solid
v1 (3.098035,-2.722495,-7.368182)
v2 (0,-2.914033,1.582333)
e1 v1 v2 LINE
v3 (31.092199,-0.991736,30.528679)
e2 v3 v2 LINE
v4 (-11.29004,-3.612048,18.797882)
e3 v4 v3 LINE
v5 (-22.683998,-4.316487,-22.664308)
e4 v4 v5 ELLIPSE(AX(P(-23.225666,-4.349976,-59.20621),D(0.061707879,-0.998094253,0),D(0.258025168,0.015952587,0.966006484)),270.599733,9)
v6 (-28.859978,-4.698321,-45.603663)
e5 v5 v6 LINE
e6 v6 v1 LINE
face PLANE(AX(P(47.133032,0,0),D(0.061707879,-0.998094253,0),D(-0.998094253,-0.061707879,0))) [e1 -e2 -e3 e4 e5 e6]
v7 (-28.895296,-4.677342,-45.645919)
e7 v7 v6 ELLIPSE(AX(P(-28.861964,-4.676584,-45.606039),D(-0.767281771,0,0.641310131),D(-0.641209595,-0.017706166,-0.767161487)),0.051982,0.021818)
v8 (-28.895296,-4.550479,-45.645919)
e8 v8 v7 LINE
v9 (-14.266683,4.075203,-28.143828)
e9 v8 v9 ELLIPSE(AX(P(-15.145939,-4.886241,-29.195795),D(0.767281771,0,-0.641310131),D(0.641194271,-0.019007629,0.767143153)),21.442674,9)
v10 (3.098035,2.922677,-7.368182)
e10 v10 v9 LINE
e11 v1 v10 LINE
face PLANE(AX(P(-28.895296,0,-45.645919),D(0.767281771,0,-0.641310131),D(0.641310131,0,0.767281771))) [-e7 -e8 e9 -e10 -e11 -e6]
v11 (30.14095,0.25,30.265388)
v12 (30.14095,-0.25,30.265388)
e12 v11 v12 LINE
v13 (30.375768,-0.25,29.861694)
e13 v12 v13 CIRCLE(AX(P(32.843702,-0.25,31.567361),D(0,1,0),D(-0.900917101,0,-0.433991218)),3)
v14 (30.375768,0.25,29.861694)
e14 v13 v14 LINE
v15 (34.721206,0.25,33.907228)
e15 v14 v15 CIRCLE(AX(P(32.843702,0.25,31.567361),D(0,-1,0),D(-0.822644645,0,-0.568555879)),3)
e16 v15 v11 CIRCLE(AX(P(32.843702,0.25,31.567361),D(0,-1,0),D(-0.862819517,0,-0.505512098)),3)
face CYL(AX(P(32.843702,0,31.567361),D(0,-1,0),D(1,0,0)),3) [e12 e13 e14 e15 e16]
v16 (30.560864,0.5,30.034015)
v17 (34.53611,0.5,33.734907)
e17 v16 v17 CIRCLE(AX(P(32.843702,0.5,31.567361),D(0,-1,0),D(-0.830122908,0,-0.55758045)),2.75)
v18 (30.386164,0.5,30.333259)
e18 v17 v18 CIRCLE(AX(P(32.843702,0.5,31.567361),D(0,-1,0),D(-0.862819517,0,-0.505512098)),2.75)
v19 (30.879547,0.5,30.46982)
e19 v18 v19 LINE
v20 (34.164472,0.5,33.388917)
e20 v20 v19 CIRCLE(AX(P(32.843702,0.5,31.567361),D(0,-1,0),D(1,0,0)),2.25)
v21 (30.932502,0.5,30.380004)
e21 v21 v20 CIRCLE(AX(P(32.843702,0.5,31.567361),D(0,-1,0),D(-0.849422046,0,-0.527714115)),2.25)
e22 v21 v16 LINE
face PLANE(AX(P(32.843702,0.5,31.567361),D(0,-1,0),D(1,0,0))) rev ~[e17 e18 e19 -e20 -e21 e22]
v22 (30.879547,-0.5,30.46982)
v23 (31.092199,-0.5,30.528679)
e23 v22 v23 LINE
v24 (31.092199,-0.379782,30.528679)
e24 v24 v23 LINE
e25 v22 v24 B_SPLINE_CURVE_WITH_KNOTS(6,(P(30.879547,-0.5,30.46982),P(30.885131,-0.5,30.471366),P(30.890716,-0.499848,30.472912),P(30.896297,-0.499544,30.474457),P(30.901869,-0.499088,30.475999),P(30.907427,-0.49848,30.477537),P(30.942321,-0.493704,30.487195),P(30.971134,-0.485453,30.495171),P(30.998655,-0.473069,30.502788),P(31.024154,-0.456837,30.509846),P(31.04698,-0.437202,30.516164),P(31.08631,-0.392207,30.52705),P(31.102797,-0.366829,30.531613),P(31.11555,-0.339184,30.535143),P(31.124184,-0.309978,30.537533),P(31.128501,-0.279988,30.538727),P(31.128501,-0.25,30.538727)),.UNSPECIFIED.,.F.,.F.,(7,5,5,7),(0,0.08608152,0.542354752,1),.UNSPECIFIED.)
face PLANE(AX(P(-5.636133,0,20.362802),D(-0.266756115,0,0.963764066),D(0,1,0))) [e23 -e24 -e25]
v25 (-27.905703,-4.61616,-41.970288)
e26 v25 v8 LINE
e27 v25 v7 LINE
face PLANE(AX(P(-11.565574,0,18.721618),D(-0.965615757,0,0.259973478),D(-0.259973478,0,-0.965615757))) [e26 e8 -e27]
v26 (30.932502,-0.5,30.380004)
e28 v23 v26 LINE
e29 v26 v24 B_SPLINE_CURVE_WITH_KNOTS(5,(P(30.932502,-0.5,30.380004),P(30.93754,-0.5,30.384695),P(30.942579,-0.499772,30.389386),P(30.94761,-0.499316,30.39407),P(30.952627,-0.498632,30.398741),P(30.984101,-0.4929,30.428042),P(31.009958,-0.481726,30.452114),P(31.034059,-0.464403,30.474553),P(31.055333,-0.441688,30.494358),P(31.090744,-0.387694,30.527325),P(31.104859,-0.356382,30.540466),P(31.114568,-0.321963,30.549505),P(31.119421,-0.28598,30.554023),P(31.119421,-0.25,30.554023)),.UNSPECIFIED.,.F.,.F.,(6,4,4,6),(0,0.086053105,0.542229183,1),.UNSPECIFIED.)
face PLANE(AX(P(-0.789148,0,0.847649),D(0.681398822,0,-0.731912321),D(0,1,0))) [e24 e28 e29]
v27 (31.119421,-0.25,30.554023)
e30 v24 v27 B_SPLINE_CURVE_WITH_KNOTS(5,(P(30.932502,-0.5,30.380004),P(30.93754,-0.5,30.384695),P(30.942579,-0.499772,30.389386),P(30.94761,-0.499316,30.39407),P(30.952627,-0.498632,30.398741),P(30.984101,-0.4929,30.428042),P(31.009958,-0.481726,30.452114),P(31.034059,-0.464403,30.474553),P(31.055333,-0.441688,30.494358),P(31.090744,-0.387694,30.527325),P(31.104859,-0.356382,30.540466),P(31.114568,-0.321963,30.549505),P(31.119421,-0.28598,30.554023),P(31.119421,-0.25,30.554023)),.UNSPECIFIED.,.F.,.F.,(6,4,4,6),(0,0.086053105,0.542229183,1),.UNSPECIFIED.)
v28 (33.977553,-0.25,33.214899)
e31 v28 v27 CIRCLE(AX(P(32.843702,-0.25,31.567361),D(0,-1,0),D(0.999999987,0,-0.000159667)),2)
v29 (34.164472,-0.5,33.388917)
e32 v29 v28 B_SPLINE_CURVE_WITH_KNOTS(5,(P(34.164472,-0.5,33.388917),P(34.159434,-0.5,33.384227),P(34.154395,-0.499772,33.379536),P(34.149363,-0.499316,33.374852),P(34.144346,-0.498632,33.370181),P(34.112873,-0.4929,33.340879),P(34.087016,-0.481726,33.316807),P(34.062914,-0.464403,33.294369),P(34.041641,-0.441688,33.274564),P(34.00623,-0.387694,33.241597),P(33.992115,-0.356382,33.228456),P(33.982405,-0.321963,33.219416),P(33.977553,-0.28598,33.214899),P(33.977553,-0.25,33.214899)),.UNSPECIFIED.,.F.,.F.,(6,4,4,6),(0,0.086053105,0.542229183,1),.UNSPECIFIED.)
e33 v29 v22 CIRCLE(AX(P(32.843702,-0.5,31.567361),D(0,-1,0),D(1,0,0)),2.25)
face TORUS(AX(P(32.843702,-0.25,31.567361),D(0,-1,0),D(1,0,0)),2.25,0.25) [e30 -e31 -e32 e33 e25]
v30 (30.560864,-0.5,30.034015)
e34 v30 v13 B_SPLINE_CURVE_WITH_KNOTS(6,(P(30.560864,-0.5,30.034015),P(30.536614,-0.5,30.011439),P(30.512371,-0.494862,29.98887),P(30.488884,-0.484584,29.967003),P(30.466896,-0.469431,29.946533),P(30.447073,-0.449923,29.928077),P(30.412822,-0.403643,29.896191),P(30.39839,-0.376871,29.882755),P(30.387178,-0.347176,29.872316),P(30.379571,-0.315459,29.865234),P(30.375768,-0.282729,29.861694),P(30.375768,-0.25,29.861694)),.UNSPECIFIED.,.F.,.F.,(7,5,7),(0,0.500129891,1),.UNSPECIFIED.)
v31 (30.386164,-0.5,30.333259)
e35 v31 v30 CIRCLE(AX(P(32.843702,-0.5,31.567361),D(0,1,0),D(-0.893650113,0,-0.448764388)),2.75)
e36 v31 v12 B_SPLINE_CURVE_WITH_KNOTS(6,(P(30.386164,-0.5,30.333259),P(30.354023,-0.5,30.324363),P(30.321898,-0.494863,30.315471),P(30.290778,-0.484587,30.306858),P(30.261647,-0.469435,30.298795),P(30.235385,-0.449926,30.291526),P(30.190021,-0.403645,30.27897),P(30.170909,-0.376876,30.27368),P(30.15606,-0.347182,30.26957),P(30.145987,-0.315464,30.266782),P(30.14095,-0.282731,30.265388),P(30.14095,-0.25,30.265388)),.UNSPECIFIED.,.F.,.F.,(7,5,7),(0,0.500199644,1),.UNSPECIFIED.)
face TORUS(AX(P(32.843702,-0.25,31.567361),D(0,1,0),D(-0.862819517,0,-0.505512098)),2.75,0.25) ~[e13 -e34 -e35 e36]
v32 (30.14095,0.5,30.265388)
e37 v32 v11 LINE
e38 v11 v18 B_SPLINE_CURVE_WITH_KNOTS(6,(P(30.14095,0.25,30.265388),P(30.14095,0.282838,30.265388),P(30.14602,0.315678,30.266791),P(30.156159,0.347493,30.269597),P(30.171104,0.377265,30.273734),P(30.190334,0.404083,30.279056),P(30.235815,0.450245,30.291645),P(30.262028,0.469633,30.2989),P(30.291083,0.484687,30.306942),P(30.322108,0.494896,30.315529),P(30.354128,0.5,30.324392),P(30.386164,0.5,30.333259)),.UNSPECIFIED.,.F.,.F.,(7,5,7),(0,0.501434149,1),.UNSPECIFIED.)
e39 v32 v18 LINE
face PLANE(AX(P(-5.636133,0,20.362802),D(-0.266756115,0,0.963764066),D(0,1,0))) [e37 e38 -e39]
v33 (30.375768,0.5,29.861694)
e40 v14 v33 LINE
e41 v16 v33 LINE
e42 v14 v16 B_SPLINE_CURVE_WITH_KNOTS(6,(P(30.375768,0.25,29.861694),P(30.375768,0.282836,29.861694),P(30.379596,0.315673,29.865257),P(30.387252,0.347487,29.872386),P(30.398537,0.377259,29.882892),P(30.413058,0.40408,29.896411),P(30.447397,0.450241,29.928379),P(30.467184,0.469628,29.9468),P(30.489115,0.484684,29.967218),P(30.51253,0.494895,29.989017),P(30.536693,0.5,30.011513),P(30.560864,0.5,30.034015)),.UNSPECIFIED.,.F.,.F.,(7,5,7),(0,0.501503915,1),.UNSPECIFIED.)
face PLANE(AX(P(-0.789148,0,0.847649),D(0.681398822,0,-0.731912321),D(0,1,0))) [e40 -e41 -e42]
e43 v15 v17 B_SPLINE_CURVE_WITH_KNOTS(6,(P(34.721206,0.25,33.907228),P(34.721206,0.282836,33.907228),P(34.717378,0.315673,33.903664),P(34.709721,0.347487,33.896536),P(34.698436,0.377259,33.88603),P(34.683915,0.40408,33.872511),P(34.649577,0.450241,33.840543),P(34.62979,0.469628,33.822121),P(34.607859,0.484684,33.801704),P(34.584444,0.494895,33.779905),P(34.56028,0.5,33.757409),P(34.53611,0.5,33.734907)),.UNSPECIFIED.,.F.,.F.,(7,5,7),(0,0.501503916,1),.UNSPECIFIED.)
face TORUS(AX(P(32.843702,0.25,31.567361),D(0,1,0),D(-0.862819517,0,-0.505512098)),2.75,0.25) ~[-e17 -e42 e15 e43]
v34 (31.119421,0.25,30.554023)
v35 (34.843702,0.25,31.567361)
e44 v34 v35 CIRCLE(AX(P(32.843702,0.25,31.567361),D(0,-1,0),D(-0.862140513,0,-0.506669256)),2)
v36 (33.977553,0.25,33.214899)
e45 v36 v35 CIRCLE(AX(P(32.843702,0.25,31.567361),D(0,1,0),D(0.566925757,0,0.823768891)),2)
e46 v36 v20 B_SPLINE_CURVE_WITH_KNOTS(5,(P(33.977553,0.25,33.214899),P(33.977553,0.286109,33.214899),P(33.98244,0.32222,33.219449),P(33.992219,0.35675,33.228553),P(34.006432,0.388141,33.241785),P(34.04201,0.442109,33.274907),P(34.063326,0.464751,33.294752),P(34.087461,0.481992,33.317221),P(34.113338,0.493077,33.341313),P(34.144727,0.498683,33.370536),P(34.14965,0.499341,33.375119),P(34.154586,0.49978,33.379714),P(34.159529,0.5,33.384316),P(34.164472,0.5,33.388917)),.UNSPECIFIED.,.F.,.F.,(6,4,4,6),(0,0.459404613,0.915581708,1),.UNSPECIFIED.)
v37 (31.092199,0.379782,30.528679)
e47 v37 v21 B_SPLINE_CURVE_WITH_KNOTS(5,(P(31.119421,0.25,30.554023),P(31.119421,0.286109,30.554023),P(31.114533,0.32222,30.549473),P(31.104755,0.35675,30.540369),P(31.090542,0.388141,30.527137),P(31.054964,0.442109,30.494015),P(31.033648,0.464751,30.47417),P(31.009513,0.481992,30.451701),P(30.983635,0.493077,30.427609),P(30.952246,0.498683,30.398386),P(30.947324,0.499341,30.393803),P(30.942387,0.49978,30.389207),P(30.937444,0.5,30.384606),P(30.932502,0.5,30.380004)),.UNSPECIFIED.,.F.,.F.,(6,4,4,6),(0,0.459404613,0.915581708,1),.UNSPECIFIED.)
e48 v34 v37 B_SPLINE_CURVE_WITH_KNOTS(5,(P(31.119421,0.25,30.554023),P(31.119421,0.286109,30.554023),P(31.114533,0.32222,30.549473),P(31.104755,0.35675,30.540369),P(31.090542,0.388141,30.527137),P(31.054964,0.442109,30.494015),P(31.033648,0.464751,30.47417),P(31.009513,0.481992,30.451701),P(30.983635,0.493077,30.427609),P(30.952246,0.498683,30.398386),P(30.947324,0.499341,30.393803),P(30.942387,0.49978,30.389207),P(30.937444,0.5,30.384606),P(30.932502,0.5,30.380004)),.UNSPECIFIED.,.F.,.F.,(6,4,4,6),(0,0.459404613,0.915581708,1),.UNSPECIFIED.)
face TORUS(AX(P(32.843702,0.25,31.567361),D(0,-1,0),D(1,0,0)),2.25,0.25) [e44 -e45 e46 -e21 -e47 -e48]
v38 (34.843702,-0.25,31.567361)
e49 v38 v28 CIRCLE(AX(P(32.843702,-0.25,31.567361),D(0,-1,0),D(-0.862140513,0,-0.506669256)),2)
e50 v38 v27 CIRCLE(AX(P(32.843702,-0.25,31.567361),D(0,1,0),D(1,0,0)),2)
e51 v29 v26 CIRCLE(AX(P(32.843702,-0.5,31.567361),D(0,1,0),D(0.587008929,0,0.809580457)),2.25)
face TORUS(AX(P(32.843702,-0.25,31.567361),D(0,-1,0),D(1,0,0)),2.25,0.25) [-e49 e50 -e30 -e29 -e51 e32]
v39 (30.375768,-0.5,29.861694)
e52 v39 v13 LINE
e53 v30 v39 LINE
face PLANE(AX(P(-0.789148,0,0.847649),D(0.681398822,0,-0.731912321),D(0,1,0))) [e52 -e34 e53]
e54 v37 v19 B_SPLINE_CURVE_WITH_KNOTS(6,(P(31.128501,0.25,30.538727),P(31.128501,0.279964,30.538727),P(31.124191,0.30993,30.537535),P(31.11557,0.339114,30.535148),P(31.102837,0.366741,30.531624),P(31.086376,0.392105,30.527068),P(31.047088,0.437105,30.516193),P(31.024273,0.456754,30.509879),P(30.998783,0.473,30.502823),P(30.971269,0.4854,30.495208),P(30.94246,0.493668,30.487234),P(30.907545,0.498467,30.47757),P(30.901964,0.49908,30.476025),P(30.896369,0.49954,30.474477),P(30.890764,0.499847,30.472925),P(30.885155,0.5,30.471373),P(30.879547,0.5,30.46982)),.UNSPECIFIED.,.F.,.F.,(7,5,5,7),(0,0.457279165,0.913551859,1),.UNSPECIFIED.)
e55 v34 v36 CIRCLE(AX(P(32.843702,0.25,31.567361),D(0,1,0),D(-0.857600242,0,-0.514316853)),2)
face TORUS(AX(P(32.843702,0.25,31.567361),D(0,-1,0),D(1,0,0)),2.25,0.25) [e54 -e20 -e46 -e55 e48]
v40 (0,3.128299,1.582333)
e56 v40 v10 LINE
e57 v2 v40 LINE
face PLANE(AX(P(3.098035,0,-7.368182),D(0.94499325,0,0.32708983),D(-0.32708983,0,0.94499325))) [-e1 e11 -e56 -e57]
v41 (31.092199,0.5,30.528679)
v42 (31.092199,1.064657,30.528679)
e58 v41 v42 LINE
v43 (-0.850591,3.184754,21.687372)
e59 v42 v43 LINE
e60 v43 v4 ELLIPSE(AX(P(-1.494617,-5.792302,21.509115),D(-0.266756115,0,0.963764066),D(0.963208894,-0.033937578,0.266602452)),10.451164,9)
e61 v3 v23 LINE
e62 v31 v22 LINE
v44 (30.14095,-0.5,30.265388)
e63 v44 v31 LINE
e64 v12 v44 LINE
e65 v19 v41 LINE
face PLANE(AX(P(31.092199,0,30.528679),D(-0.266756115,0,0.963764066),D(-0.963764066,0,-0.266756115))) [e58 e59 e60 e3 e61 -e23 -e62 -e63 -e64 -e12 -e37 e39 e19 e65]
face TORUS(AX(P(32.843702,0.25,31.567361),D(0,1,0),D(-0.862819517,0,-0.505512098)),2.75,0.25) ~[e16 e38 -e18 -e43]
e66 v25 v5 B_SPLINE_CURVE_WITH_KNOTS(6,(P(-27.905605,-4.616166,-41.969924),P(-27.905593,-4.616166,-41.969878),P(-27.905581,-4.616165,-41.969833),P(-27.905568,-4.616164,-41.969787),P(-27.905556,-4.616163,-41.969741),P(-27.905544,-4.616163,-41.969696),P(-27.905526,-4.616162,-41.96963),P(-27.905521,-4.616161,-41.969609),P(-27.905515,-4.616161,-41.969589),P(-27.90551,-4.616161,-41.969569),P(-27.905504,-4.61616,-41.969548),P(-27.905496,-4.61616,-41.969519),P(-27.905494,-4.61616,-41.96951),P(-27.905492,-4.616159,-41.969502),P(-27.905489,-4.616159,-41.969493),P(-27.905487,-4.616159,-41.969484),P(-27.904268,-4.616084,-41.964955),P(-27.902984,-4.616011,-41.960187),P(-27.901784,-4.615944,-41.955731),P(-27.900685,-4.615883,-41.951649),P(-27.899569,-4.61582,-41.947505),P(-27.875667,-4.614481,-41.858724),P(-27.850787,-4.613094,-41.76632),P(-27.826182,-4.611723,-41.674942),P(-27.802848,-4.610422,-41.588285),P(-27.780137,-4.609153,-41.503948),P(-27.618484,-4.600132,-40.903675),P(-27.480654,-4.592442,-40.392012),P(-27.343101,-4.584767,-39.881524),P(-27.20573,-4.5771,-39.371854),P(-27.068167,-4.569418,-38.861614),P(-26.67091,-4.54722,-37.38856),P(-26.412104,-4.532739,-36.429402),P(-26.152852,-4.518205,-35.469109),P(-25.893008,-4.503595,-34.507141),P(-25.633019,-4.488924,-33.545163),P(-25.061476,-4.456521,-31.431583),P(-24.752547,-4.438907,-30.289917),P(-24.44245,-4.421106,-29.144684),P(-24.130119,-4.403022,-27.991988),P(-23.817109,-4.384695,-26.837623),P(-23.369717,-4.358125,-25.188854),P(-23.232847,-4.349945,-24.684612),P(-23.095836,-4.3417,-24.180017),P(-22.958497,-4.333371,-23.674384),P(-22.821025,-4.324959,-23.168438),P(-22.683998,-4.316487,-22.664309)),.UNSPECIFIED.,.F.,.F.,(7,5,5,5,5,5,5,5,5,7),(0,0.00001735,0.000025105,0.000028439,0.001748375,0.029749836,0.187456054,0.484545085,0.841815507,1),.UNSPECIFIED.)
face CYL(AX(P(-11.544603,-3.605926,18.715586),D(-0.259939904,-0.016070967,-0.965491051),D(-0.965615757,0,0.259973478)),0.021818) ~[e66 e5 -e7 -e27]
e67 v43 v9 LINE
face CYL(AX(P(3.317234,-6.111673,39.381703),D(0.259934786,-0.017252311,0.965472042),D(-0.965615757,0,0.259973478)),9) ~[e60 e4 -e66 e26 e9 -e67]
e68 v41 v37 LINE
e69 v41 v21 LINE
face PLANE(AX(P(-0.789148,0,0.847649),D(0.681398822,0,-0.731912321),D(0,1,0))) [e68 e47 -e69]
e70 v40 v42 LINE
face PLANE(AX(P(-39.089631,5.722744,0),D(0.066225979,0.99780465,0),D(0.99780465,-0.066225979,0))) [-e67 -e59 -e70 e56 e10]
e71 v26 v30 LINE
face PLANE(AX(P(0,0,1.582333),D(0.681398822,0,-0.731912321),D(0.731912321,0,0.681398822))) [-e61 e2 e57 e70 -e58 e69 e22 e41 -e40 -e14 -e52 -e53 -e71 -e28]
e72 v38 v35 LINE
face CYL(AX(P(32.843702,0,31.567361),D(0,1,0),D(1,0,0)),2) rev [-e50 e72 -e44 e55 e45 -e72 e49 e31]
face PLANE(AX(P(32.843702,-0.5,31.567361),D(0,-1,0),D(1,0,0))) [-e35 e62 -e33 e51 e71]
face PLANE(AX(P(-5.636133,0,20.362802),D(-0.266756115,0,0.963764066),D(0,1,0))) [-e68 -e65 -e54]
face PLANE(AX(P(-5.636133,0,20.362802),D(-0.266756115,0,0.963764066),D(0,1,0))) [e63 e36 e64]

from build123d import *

# Parameters (mm, degrees)
F1_DEPTH      = 5
F1_DEPTH_BACK = 5
F2_W          = 100.360032171
F2_H          = 34.278569743
F3_DEPTH      = 63.9
F3_DEPTH_BACK = 50
F4_R          = 0.0218183936
F5_T1_DEPTH   = 111.9716351384
F6_R          = 3
F6_R_2        = 2
F7_DEPTH      = 0.5
F7_DEPTH_BACK = 0.5
F8_T4_ANGLE   = 359.64
F8_T9_ANGLE   = 359.64
F8_T34_ANGLE  = 359.64
F8_T39_ANGLE  = 359.64


# Not quite as in the source:
# - a fillet or chamfer that OpenCascade refuses, or shapes differently, is made with other operations: its cross-section is extruded or revolved along the edge and cut away or added


with BuildPart() as f1:
    # F0 (on Front) → F1 (new body, two sides)
    with BuildSketch(Plane.XZ) as f1_sk:
        Polygon((31.0921985656, 30.5286794901), (-11.5655744448, 18.7216177583), (-28.8952961564, -45.6459186971), (3.0980354641, -7.3681822978), (0, 1.582333236), align=None)
    extrude(amount=F1_DEPTH)
    extrude(f1_sk.sketch, amount=-F1_DEPTH_BACK)

    # F2 (on Top) → F3 (cut, two sides)
    with BuildSketch(Plane.XY) as f3_sk:
        with Locations((1.9043665379, 3.6182934418)):
            Rectangle(F2_W, F2_H)
        Polygon((-39.0896312892, -5.3307767957), (-39.0896312892, 5.7227437609), (47.1330322325, 0), align=None, mode=Mode.SUBTRACT)
    extrude(amount=-F3_DEPTH, mode=Mode.SUBTRACT)
    extrude(f3_sk.sketch, amount=F3_DEPTH_BACK, mode=Mode.SUBTRACT)

    # F4
    f4_edges = [f1.edges().sort_by_distance(p)[0] for p in [
        (-20.230435, -4.164794, -13.46215),
    ]]
    fillet(f4_edges, radius=F4_R)

    # F5: fillet of radius 9 on 2 edges, made by hand

    # F5_s2 → F5_t1 (cut)
    with BuildSketch(Plane(origin=(10.1347631785, -0.6726613442, 37.6434053136), x_dir=(-0.0662259794, -0.99780465, 0), z_dir=(-0.259934786, 0.0172523106, -0.9654720425))):
        with BuildLine():
            ThreePointArc((6.4541084226, 15.6543338505), (-0.2785467468, 13.2370471707), (-3.1214312203, 6.6727552521))
            Line((-3.1214312203, 6.6727552521), (-3.1214312203, 16.2679345229))
            Line((-3.1214312203, 16.2679345229), (6.4541084226, 15.6543338505))
        make_face()
    extrude(amount=F5_T1_DEPTH, mode=Mode.SUBTRACT)

    # F6 (on Front) → F7 (join, two sides)
    with BuildSketch(Plane.XZ) as f7_sk:
        with Locations((32.8437015414, 31.5673612058)):
            Circle(F6_R)
        with Locations((32.8437015414, 31.5673612058)):
            Circle(F6_R_2, mode=Mode.SUBTRACT)
    extrude(amount=F7_DEPTH)
    extrude(f7_sk.sketch, amount=-F7_DEPTH_BACK)

    # F8: fillet of radius 0.25 on 4 edges, made by hand


with BuildPart() as f8_tool2:
    # F8_s3 → F8_t4 (revolve)
    with BuildSketch(Plane(origin=(-5.375639349, 0, 9.1752631985), x_dir=(0, 1, 0), z_dir=(-0.5055120978, 0, 0.8628195171))):
        with BuildLine():
            ThreePointArc((0.25, -41.2958696863), (0.4267766953, -41.369092991), (0.5, -41.5458696863))
            Line((0.5, -41.5458696863), (0.5, -41.2958696863))
            Line((0.5, -41.2958696863), (0.25, -41.2958696863))
        make_face()
    revolve(axis=Axis((32.8437015414, 0.5, 31.5673612058), (0, -1, 0)), revolution_arc=F8_T4_ANGLE)

    split(bisect_by=Plane(origin=(-0.7891478665, 0, 0.8476490244), x_dir=(0, 1, 0), z_dir=(0.6813988218, 0, -0.731912321)), keep=Keep.TOP)


with BuildPart() as f1_1:
    add(f1.part)

    # F8_t1: cut F8_tool2
    add(f8_tool2.part, mode=Mode.SUBTRACT)


with BuildPart() as f8_tool7:
    # F8_s8 → F8_t9 (revolve)
    with BuildSketch(Plane(origin=(-5.375639349, 0, 9.1752631985), x_dir=(0, 1, 0), z_dir=(-0.5055120978, 0, 0.8628195171))):
        with BuildLine():
            ThreePointArc((0.25, -41.2958696863), (0.4267766953, -41.369092991), (0.5, -41.5458696863))
            Line((0.5, -41.5458696863), (0.5, -41.2958696863))
            Line((0.5, -41.2958696863), (0.25, -41.2958696863))
        make_face()
    revolve(axis=Axis((32.8437015414, 0.5, 31.5673612058), (0, -1, 0)), revolution_arc=F8_T9_ANGLE)

    split(bisect_by=Plane(origin=(-5.636132621, 0, 20.3628024875), x_dir=(0, 1, 0), z_dir=(-0.2667561154, 0, 0.963764066)), keep=Keep.TOP)


with BuildPart() as f1_2:
    add(f1_1.part)

    # F8_t6: cut F8_tool7
    add(f8_tool7.part, mode=Mode.SUBTRACT)


with BuildPart() as f8_tool12:
    # F8_s13 → F8_t14 (revolve)
    with BuildSketch(Plane.XY.offset(31.5673612058)):
        with BuildLine():
            ThreePointArc((35.0937015414, -0.5), (34.9169248461, -0.4267766953), (34.8437015414, -0.25))
            Line((34.8437015414, -0.25), (34.8437015414, -0.5))
            Line((34.8437015414, -0.5), (35.0937015414, -0.5))
        make_face()
    revolve(axis=Axis((32.8437015414, -0.5, 31.5673612058), (0, -1, 0)))

    split(bisect_by=Plane(origin=(-0.7891478665, 0, 0.8476490244), x_dir=(0, 1, 0), z_dir=(0.6813988218, 0, -0.731912321)), keep=Keep.TOP)


with BuildPart() as f1_3:
    add(f1_2.part)

    # F8_t11: cut F8_tool12
    add(f8_tool12.part, mode=Mode.SUBTRACT)


with BuildPart() as f8_tool17:
    # F8_s18 → F8_t19 (revolve)
    with BuildSketch(Plane.XY.offset(31.5673612058)):
        with BuildLine():
            ThreePointArc((35.0937015414, -0.5), (34.9169248461, -0.4267766953), (34.8437015414, -0.25))
            Line((34.8437015414, -0.25), (34.8437015414, -0.5))
            Line((34.8437015414, -0.5), (35.0937015414, -0.5))
        make_face()
    revolve(axis=Axis((32.8437015414, -0.5, 31.5673612058), (0, -1, 0)))

    split(bisect_by=Plane(origin=(-5.636132621, 0, 20.3628024875), x_dir=(0, 1, 0), z_dir=(-0.2667561154, 0, 0.963764066)), keep=Keep.TOP)


with BuildPart() as f1_4:
    add(f1_3.part)

    # F8_t16: cut F8_tool17
    add(f8_tool17.part, mode=Mode.SUBTRACT)


with BuildPart() as f8_tool22:
    # F8_s23 → F8_t24 (revolve)
    with BuildSketch(Plane.XY.offset(31.5673612058)):
        with BuildLine():
            ThreePointArc((34.8437015414, 0.25), (34.9169248461, 0.4267766953), (35.0937015414, 0.5))
            Line((35.0937015414, 0.5), (34.8437015414, 0.5))
            Line((34.8437015414, 0.5), (34.8437015414, 0.25))
        make_face()
    revolve(axis=Axis((32.8437015414, 0.5, 31.5673612058), (0, -1, 0)))

    split(bisect_by=Plane(origin=(-0.7891478665, 0, 0.8476490244), x_dir=(0, 1, 0), z_dir=(0.6813988218, 0, -0.731912321)), keep=Keep.TOP)


with BuildPart() as f1_5:
    add(f1_4.part)

    # F8_t21: cut F8_tool22
    add(f8_tool22.part, mode=Mode.SUBTRACT)


with BuildPart() as f8_tool27:
    # F8_s28 → F8_t29 (revolve)
    with BuildSketch(Plane.XY.offset(31.5673612058)):
        with BuildLine():
            ThreePointArc((34.8437015414, 0.25), (34.9169248461, 0.4267766953), (35.0937015414, 0.5))
            Line((35.0937015414, 0.5), (34.8437015414, 0.5))
            Line((34.8437015414, 0.5), (34.8437015414, 0.25))
        make_face()
    revolve(axis=Axis((32.8437015414, 0.5, 31.5673612058), (0, -1, 0)))

    split(bisect_by=Plane(origin=(-5.636132621, 0, 20.3628024875), x_dir=(0, 1, 0), z_dir=(-0.2667561154, 0, 0.963764066)), keep=Keep.TOP)


with BuildPart() as f1_6:
    add(f1_5.part)

    # F8_t26: cut F8_tool27
    add(f8_tool27.part, mode=Mode.SUBTRACT)


with BuildPart() as f8_tool32:
    # F8_s33 → F8_t34 (revolve)
    with BuildSketch(Plane(origin=(-5.375639349, 0, 9.1752631985), x_dir=(0, 1, 0), z_dir=(-0.5055120978, 0, 0.8628195171))):
        with BuildLine():
            ThreePointArc((-0.5, -41.5458696863), (-0.4267766953, -41.369092991), (-0.25, -41.2958696863))
            Line((-0.25, -41.2958696863), (-0.5, -41.2958696863))
            Line((-0.5, -41.2958696863), (-0.5, -41.5458696863))
        make_face()
    revolve(axis=Axis((32.8437015414, -0.5, 31.5673612058), (0, -1, 0)), revolution_arc=F8_T34_ANGLE)

    split(bisect_by=Plane(origin=(-0.7891478665, 0, 0.8476490244), x_dir=(0, 1, 0), z_dir=(0.6813988218, 0, -0.731912321)), keep=Keep.TOP)


with BuildPart() as f1_7:
    add(f1_6.part)

    # F8_t31: cut F8_tool32
    add(f8_tool32.part, mode=Mode.SUBTRACT)


with BuildPart() as f8_tool37:
    # F8_s38 → F8_t39 (revolve)
    with BuildSketch(Plane(origin=(-5.375639349, 0, 9.1752631985), x_dir=(0, 1, 0), z_dir=(-0.5055120978, 0, 0.8628195171))):
        with BuildLine():
            ThreePointArc((-0.5, -41.5458696863), (-0.4267766953, -41.369092991), (-0.25, -41.2958696863))
            Line((-0.25, -41.2958696863), (-0.5, -41.2958696863))
            Line((-0.5, -41.2958696863), (-0.5, -41.5458696863))
        make_face()
    revolve(axis=Axis((32.8437015414, -0.5, 31.5673612058), (0, -1, 0)), revolution_arc=F8_T39_ANGLE)

    split(bisect_by=Plane(origin=(-5.636132621, 0, 20.3628024875), x_dir=(0, 1, 0), z_dir=(-0.2667561154, 0, 0.963764066)), keep=Keep.TOP)


with BuildPart() as f1_8:
    add(f1_7.part)

    # F8_t36: cut F8_tool37
    add(f8_tool37.part, mode=Mode.SUBTRACT)


solid = f1_8.part
